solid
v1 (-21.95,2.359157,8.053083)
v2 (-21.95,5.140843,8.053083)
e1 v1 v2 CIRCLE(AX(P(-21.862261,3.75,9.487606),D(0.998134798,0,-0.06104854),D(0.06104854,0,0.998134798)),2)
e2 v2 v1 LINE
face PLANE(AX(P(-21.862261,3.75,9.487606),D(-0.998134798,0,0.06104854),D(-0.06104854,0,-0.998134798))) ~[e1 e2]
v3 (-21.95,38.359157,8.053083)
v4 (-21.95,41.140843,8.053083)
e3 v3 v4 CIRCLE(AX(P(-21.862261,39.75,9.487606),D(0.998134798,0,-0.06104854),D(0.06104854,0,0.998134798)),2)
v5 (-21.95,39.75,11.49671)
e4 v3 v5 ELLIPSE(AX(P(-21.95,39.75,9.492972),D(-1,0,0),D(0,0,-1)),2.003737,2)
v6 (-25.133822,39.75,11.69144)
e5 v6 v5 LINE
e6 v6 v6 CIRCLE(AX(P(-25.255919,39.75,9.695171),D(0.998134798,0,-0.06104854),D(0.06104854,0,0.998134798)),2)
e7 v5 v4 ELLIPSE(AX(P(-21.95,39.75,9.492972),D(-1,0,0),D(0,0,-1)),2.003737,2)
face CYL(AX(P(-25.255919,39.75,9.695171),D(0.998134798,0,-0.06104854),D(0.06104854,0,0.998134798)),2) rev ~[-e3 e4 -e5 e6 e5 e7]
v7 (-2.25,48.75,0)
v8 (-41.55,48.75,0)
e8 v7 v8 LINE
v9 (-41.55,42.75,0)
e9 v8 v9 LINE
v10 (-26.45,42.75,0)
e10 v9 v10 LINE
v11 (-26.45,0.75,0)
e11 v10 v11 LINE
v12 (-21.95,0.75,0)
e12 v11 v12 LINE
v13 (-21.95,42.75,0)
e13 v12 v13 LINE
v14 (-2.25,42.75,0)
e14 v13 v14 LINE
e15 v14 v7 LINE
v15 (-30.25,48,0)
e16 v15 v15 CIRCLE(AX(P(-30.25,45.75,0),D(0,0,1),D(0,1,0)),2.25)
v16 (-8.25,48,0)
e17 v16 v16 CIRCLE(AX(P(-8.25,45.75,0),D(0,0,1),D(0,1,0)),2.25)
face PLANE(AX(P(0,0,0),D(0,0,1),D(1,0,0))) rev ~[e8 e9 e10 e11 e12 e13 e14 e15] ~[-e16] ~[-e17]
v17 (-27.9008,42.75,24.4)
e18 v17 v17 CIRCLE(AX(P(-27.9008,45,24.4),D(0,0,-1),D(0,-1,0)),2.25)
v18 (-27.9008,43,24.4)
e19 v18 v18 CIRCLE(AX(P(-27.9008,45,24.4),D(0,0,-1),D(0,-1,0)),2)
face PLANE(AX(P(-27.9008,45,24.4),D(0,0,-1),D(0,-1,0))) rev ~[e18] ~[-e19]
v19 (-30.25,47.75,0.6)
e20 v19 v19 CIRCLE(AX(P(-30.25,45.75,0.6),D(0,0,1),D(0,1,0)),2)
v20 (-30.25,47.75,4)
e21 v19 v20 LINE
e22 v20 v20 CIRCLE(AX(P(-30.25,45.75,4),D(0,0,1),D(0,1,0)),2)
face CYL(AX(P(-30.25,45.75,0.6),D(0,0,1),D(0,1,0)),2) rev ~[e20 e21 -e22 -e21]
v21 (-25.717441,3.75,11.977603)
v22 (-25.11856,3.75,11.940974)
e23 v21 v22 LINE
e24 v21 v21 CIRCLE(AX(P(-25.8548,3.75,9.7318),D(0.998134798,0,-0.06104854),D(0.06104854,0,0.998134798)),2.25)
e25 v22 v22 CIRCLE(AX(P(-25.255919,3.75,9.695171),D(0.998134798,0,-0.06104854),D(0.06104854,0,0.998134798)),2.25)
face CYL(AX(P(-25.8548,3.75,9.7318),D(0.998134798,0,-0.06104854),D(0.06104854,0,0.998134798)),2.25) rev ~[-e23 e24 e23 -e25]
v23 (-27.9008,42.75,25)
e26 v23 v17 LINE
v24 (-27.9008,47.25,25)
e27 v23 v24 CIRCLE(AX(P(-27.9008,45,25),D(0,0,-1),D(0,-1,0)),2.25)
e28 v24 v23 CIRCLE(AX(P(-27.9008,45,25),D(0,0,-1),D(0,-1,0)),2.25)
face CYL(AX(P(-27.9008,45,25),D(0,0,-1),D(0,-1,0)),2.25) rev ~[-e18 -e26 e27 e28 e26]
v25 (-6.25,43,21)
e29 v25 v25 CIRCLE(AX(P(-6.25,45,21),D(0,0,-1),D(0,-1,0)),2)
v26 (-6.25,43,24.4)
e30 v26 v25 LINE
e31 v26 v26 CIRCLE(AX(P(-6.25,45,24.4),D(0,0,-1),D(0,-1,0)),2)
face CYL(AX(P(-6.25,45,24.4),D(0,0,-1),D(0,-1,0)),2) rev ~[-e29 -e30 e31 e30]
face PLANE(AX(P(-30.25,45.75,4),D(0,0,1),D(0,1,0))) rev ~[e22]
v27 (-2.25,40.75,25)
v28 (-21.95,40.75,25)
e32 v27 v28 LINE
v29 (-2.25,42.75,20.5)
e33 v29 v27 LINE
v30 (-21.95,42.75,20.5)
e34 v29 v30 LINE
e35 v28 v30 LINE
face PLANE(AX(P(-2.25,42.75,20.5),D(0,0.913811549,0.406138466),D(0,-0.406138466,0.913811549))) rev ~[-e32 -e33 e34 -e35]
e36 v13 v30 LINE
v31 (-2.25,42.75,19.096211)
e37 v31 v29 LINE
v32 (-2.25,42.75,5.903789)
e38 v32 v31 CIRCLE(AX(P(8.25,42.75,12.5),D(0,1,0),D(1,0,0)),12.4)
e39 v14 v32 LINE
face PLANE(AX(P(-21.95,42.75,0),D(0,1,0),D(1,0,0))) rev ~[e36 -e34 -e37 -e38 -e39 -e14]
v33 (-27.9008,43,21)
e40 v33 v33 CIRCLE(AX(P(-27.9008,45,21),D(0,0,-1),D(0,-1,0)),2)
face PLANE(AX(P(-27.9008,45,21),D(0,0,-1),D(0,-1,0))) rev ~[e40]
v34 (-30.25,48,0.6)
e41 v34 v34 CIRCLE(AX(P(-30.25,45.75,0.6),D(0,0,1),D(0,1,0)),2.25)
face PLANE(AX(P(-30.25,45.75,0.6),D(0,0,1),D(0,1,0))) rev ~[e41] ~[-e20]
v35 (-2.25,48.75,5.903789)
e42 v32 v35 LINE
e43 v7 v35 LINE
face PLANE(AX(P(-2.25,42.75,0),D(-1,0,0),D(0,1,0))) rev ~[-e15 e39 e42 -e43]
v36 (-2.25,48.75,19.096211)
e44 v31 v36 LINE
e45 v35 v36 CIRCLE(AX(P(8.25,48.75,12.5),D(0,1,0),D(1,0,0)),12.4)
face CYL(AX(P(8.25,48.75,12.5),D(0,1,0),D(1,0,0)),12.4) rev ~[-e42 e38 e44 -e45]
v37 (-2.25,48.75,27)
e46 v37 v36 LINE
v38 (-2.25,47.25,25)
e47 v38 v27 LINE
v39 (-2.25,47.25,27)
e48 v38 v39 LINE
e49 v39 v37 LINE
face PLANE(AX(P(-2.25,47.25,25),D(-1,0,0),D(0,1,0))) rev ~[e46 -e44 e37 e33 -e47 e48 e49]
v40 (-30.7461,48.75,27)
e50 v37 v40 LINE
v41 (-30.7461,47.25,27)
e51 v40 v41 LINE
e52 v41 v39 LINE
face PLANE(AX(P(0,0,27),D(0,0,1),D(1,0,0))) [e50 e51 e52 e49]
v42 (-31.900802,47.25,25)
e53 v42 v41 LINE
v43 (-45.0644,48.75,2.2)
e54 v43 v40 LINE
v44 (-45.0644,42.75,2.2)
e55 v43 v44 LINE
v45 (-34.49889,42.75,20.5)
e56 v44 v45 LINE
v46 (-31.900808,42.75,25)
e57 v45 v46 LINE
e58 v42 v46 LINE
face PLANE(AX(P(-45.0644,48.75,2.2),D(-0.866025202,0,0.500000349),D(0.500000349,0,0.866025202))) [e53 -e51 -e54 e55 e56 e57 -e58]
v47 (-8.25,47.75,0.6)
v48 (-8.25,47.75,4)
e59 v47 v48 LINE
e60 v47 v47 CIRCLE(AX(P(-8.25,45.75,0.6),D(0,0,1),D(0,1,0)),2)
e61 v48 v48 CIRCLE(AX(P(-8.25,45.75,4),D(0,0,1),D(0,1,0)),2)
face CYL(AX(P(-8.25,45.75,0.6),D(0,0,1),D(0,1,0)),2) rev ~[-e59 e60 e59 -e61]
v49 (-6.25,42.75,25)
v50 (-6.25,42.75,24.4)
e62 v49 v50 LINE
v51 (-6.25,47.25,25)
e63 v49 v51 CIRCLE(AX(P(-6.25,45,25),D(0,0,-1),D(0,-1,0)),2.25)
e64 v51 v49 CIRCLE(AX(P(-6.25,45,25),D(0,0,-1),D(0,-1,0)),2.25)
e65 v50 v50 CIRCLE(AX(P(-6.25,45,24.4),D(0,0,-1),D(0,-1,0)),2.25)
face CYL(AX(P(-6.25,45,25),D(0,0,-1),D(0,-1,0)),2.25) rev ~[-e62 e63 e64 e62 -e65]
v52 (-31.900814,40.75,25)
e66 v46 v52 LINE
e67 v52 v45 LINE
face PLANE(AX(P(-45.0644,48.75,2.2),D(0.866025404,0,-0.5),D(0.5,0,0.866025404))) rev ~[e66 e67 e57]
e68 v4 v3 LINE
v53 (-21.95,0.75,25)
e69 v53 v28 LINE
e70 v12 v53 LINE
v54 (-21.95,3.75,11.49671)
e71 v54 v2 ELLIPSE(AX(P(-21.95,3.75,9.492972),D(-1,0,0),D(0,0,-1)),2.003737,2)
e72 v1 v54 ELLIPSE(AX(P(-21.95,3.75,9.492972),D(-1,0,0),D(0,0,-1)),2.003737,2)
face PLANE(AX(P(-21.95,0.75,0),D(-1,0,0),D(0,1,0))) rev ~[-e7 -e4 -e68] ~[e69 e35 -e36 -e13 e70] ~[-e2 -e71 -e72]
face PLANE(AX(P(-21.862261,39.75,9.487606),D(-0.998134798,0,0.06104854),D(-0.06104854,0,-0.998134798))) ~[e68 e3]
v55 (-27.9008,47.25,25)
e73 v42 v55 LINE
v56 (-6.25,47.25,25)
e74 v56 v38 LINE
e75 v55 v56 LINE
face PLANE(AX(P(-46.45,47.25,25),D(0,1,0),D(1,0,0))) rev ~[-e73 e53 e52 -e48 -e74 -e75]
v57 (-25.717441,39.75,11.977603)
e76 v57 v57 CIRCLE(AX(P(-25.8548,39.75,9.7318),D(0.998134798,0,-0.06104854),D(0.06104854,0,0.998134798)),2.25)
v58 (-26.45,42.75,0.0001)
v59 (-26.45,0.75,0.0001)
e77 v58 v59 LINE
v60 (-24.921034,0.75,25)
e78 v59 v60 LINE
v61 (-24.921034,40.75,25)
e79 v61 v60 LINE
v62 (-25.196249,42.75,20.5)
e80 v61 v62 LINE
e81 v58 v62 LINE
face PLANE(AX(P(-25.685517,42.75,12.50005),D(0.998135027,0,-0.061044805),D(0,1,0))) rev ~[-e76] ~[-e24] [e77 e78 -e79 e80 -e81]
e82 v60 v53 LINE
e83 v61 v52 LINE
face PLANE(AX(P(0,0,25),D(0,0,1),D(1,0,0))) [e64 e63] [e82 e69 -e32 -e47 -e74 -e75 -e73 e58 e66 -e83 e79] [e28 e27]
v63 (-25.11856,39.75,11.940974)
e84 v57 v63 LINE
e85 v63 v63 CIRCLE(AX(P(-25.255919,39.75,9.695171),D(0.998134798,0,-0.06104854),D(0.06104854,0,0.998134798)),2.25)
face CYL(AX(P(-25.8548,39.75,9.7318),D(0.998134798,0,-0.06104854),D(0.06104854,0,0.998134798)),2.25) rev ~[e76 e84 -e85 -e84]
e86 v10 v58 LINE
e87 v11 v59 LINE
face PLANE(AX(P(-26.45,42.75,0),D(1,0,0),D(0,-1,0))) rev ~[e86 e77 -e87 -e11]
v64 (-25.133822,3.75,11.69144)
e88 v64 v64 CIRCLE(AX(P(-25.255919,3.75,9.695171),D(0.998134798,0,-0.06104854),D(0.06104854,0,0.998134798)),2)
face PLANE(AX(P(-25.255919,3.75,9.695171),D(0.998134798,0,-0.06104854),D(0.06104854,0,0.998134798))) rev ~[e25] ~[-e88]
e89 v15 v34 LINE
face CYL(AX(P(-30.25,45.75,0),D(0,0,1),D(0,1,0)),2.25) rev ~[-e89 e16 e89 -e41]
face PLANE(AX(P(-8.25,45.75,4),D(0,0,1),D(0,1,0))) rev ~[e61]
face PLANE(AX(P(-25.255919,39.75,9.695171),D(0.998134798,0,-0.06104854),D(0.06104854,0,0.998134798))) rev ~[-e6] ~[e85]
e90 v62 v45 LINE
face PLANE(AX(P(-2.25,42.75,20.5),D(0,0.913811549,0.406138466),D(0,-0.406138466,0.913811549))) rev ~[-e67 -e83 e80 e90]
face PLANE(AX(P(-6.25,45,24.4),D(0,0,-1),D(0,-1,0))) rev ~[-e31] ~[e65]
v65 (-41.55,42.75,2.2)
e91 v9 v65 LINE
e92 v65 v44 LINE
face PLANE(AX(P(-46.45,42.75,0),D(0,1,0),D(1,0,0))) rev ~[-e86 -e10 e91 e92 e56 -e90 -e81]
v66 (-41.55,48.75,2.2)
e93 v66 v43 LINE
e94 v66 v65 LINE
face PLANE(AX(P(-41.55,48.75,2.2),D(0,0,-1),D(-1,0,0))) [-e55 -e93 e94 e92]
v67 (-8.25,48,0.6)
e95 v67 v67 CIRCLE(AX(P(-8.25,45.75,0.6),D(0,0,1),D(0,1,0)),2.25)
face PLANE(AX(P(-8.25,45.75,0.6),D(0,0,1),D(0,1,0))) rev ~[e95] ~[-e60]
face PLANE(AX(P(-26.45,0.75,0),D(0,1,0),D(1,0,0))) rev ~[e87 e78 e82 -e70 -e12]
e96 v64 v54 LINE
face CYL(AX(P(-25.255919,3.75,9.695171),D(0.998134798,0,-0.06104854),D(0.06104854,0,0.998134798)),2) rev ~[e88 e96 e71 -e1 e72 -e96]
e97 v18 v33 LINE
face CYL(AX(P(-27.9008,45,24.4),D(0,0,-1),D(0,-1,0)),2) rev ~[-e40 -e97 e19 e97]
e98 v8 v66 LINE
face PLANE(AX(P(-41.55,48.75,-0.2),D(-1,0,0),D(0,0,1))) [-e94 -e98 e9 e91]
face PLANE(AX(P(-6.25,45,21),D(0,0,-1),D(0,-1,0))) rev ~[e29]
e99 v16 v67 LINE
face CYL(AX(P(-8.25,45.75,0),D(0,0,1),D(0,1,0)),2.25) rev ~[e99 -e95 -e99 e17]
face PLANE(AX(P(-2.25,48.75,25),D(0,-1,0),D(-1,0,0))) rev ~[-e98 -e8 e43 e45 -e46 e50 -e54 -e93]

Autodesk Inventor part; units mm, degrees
ref_plane "YZ Plane" through (0, 0, 0) normal (1, 0, 0) x (0, 1, 0)
ref_plane "XZ Plane" through (0, 0, 0) normal (0, 1, 0) x (-1, 0, 0)
ref_plane "XY Plane" through (0, 0, 0) normal (0, 0, 1) x (1, 0, 0)
ref_plane "Work Plane1" through (0, 0, 0) normal (0, 0, 1) x (1, 0, 0)
sketch "Sketch1" plane through (0, 0, 0) normal (0, 0, 1) x (1, 0, 0)
  line L0 (22.75, 48.75) -> (-33.25, 48.75) construction
  line L1 (-46.45, 48.75) -> (-46.45, 42.75)
  line L2 (-21.95, 42.75) -> (-26.45, 42.75)
  line L3 (-26.45, 42.75) -> (-26.45, 0.75)
  line L4 (-26.45, 0.75) -> (-21.95, 0.75)
  line L5 (-21.95, 0.75) -> (-21.95, 42.75)
  line L6 (-46.45, 49) -> (-46.45, 41.0784) construction
  line L7 (-46.45, 42.75) -> (-2.25, 42.75)
  line L8 (-2.25, 42.75) -> (-2.25, 48.75)
  line L9 (-2.25, 48.75) -> (-46.45, 48.75)
  line L10 (22.75, -48.75) -> (22.75, 48.75) construction
  point P0 (0, 0)
  dimension "d1" = 20
  dimension "d2" = 4.5
  dimension "d23" = 25
  dimension "d24" = 6
  dimension "d25" = 48
extrude "Extrusion1" add sketch "Sketch1" along normal blind 25
chamfer "Chamfer2" distance 25 angle 3.5 1 edges at (-26.45, 21.75, 25) measured on face at (-26.45, 28.75, 8.3333)
sketch "Sketch2" plane through (-26.45, 0.75, 0) normal (-0.9981348, 0, 0.0610485) x (0.0610485, 0, 0.9981348)
  line L0 (0, 0) -> (25.0467, 0) construction
  line L1 (0, 42) -> (0, 0) construction
  line L2 (9.75, 39) -> (9.75, 3) construction
  point P0 (1.6147, -0.75)
  point P1 (9.75, 21)
  point P2 (0, 21)
  dimension "d12" = 36
  dimension "d13" = 9.75
hole "Hole1" at (-25.8548, 39.75, 9.7318) at (-25.8548, 3.75, 9.7318) direction (0.9981348, 0, -0.0610485) diameter 4 depth 4 counterbore diameter 4.5 counterbore depth 0.6
sketch "Sketch4" plane through (-2.25, 48.75, 25) normal (0, 1, 0) x (1, 0, 0)
  circle A0 centre (10.5, 12.5) radius 12.2 construction
  circle A1 centre (10.5, 12.5) radius 12.4
  dimension "d42" = 0.2
extrude "Extrusion3" cut sketch "Sketch4" against normal through all
sketch "Sketch5" plane through (0, 0, 25) normal (0, 0, 1) x (1, 0, 0)
  line L0 (-46.45, 48.75) -> (-46.45, 42.75) projected
  line L1 (-2.25, 48.75) -> (-46.45, 48.75)
  line L2 (-46.45, 48.75) -> (-46.45, 47.25)
  line L3 (-46.45, 47.25) -> (-2.25, 47.25)
  line L4 (-2.25, 47.25) -> (-2.25, 48.75)
  point P0 (0, 0)
  dimension "d29" = 1.5
extrude "Extrusion4" add sketch "Sketch5" along normal blind 2
sketch "Sketch3" plane through (22.75, 48.75, 25) normal (0, 1, 0) x (1, 0, 0)
  line L0 (-69.2, 23) -> (-64.5, 23) projected
  line L1 (-64.5, 23) -> (-64.5, 25) projected
  line L2 (-64.5, 25) -> (-69, 25) projected
  line L3 (-69, 25) -> (-69, 27.5) projected
  line L4 (-69, 27.5) -> (-73.7, 27.5) projected
  line L5 (-73.7, 27.5) -> (-69.2, 23) projected
  line L6 (-64.3, 22.8) -> (-69.2828, 22.8)
  line L7 (-69.2828, 22.8) -> (-74.1828, 27.7)
  line L8 (-74.1828, 27.7) -> (-68.8, 27.7)
  line L9 (-68.8, 27.7) -> (-68.8, 25.2)
  line L10 (-68.8, 25.2) -> (-64.3, 25.2)
  line L11 (-64.3, 25.2) -> (-64.3, 22.8)
  line L12 (-69.2, 25) -> (-69.2, -2) projected
  line L13 (-69.2, 22.8) -> (-54.8817, -2)
  line L14 (-54.8817, -2) -> (-69.2, -2)
  line L15 (-69.2, -2) -> (-69.2, 22.8)
  line L16 (-54.8817, -2) -> (-53.4961, -2)
  line L17 (-25, -2) -> (-69.2, -2) projected
  line L18 (-67.8144, 22.8) -> (-53.4961, -2)
  point P0 (-22.75, 25)
  point P1 (-68.85, 25.15)
  point P2 (-68.7, 25)
  dimension "d32" = 0.2
  dimension "d33" = 30
  dimension "d34" = 1.2
extrude "Extrusion2" cut sketch "Sketch3" against normal through all contours L5 L4 L3 L2 L1 L0 | L6 L7 L8 L9 L10 L11 | L18 L16 L13 L6 | L13 L14 L12
sketch "Sketch6" plane through (0, 0, 0) normal (0, 0, -1) x (-1, 0, 0)
  arc A0 (7.2895, 48.75) -> (9.2105, 48.75) centre (8.25, 45.75) ccw construction
  arc A1 (29.2895, 48.75) -> (33.25, 44.7895) centre (30.25, 45.75) ccw construction
  point P0 (0, 0)
hole "Hole2" at (-8.25, 45.75, 0) at (-30.25, 45.75, 0) direction (0, 0, 1) diameter 4 depth 4 counterbore diameter 4.5 counterbore depth 0.6
sketch "Sketch7" plane through (0, 0, 25) normal (0, 0, 1) x (1, 0, 0)
  line L0 (-2.25, 42.75) -> (-2.25, 47.25) construction
  line L1 (-31.9008, 47.25) -> (-31.9008, 42.75) construction
  point P0 (0, 0)
  point P1 (-6.25, 45)
  point P2 (-27.9008, 45)
  point P3 (-2.25, 45)
  point P4 (-2.25, 45)
  dimension "d43" = 4
  dimension "d44" = 4
hole "Hole3" at (-27.9008, 45, 25) at (-6.25, 45, 25) direction (0, 0, -1) diameter 4 depth 4 counterbore diameter 4.5 counterbore depth 0.6
sketch "Sketch8" plane through (-2.25, 42.75, 19.0962) normal (1, 0, 0) x (0, 0, -1)
  line L0 (-5.9038, 0) -> (19.0962, 0) projected
  line L1 (-1.4038, 0) -> (-5.9038, -2)
  line L2 (-5.9038, -42) -> (-5.9038, 0) projected
  line L3 (-5.9038, 0) -> (-5.9038, -2)
  point P0 (19.0962, -42.75)
  dimension "d52" = 4.5
  dimension "d53" = 2
extrude "Extrusion5" add sketch "Sketch8" against normal up to surface surface through (-45.0644, 48.75, 2.2) normal (0.8660254, 0, -0.5)
properties part number "bok"
